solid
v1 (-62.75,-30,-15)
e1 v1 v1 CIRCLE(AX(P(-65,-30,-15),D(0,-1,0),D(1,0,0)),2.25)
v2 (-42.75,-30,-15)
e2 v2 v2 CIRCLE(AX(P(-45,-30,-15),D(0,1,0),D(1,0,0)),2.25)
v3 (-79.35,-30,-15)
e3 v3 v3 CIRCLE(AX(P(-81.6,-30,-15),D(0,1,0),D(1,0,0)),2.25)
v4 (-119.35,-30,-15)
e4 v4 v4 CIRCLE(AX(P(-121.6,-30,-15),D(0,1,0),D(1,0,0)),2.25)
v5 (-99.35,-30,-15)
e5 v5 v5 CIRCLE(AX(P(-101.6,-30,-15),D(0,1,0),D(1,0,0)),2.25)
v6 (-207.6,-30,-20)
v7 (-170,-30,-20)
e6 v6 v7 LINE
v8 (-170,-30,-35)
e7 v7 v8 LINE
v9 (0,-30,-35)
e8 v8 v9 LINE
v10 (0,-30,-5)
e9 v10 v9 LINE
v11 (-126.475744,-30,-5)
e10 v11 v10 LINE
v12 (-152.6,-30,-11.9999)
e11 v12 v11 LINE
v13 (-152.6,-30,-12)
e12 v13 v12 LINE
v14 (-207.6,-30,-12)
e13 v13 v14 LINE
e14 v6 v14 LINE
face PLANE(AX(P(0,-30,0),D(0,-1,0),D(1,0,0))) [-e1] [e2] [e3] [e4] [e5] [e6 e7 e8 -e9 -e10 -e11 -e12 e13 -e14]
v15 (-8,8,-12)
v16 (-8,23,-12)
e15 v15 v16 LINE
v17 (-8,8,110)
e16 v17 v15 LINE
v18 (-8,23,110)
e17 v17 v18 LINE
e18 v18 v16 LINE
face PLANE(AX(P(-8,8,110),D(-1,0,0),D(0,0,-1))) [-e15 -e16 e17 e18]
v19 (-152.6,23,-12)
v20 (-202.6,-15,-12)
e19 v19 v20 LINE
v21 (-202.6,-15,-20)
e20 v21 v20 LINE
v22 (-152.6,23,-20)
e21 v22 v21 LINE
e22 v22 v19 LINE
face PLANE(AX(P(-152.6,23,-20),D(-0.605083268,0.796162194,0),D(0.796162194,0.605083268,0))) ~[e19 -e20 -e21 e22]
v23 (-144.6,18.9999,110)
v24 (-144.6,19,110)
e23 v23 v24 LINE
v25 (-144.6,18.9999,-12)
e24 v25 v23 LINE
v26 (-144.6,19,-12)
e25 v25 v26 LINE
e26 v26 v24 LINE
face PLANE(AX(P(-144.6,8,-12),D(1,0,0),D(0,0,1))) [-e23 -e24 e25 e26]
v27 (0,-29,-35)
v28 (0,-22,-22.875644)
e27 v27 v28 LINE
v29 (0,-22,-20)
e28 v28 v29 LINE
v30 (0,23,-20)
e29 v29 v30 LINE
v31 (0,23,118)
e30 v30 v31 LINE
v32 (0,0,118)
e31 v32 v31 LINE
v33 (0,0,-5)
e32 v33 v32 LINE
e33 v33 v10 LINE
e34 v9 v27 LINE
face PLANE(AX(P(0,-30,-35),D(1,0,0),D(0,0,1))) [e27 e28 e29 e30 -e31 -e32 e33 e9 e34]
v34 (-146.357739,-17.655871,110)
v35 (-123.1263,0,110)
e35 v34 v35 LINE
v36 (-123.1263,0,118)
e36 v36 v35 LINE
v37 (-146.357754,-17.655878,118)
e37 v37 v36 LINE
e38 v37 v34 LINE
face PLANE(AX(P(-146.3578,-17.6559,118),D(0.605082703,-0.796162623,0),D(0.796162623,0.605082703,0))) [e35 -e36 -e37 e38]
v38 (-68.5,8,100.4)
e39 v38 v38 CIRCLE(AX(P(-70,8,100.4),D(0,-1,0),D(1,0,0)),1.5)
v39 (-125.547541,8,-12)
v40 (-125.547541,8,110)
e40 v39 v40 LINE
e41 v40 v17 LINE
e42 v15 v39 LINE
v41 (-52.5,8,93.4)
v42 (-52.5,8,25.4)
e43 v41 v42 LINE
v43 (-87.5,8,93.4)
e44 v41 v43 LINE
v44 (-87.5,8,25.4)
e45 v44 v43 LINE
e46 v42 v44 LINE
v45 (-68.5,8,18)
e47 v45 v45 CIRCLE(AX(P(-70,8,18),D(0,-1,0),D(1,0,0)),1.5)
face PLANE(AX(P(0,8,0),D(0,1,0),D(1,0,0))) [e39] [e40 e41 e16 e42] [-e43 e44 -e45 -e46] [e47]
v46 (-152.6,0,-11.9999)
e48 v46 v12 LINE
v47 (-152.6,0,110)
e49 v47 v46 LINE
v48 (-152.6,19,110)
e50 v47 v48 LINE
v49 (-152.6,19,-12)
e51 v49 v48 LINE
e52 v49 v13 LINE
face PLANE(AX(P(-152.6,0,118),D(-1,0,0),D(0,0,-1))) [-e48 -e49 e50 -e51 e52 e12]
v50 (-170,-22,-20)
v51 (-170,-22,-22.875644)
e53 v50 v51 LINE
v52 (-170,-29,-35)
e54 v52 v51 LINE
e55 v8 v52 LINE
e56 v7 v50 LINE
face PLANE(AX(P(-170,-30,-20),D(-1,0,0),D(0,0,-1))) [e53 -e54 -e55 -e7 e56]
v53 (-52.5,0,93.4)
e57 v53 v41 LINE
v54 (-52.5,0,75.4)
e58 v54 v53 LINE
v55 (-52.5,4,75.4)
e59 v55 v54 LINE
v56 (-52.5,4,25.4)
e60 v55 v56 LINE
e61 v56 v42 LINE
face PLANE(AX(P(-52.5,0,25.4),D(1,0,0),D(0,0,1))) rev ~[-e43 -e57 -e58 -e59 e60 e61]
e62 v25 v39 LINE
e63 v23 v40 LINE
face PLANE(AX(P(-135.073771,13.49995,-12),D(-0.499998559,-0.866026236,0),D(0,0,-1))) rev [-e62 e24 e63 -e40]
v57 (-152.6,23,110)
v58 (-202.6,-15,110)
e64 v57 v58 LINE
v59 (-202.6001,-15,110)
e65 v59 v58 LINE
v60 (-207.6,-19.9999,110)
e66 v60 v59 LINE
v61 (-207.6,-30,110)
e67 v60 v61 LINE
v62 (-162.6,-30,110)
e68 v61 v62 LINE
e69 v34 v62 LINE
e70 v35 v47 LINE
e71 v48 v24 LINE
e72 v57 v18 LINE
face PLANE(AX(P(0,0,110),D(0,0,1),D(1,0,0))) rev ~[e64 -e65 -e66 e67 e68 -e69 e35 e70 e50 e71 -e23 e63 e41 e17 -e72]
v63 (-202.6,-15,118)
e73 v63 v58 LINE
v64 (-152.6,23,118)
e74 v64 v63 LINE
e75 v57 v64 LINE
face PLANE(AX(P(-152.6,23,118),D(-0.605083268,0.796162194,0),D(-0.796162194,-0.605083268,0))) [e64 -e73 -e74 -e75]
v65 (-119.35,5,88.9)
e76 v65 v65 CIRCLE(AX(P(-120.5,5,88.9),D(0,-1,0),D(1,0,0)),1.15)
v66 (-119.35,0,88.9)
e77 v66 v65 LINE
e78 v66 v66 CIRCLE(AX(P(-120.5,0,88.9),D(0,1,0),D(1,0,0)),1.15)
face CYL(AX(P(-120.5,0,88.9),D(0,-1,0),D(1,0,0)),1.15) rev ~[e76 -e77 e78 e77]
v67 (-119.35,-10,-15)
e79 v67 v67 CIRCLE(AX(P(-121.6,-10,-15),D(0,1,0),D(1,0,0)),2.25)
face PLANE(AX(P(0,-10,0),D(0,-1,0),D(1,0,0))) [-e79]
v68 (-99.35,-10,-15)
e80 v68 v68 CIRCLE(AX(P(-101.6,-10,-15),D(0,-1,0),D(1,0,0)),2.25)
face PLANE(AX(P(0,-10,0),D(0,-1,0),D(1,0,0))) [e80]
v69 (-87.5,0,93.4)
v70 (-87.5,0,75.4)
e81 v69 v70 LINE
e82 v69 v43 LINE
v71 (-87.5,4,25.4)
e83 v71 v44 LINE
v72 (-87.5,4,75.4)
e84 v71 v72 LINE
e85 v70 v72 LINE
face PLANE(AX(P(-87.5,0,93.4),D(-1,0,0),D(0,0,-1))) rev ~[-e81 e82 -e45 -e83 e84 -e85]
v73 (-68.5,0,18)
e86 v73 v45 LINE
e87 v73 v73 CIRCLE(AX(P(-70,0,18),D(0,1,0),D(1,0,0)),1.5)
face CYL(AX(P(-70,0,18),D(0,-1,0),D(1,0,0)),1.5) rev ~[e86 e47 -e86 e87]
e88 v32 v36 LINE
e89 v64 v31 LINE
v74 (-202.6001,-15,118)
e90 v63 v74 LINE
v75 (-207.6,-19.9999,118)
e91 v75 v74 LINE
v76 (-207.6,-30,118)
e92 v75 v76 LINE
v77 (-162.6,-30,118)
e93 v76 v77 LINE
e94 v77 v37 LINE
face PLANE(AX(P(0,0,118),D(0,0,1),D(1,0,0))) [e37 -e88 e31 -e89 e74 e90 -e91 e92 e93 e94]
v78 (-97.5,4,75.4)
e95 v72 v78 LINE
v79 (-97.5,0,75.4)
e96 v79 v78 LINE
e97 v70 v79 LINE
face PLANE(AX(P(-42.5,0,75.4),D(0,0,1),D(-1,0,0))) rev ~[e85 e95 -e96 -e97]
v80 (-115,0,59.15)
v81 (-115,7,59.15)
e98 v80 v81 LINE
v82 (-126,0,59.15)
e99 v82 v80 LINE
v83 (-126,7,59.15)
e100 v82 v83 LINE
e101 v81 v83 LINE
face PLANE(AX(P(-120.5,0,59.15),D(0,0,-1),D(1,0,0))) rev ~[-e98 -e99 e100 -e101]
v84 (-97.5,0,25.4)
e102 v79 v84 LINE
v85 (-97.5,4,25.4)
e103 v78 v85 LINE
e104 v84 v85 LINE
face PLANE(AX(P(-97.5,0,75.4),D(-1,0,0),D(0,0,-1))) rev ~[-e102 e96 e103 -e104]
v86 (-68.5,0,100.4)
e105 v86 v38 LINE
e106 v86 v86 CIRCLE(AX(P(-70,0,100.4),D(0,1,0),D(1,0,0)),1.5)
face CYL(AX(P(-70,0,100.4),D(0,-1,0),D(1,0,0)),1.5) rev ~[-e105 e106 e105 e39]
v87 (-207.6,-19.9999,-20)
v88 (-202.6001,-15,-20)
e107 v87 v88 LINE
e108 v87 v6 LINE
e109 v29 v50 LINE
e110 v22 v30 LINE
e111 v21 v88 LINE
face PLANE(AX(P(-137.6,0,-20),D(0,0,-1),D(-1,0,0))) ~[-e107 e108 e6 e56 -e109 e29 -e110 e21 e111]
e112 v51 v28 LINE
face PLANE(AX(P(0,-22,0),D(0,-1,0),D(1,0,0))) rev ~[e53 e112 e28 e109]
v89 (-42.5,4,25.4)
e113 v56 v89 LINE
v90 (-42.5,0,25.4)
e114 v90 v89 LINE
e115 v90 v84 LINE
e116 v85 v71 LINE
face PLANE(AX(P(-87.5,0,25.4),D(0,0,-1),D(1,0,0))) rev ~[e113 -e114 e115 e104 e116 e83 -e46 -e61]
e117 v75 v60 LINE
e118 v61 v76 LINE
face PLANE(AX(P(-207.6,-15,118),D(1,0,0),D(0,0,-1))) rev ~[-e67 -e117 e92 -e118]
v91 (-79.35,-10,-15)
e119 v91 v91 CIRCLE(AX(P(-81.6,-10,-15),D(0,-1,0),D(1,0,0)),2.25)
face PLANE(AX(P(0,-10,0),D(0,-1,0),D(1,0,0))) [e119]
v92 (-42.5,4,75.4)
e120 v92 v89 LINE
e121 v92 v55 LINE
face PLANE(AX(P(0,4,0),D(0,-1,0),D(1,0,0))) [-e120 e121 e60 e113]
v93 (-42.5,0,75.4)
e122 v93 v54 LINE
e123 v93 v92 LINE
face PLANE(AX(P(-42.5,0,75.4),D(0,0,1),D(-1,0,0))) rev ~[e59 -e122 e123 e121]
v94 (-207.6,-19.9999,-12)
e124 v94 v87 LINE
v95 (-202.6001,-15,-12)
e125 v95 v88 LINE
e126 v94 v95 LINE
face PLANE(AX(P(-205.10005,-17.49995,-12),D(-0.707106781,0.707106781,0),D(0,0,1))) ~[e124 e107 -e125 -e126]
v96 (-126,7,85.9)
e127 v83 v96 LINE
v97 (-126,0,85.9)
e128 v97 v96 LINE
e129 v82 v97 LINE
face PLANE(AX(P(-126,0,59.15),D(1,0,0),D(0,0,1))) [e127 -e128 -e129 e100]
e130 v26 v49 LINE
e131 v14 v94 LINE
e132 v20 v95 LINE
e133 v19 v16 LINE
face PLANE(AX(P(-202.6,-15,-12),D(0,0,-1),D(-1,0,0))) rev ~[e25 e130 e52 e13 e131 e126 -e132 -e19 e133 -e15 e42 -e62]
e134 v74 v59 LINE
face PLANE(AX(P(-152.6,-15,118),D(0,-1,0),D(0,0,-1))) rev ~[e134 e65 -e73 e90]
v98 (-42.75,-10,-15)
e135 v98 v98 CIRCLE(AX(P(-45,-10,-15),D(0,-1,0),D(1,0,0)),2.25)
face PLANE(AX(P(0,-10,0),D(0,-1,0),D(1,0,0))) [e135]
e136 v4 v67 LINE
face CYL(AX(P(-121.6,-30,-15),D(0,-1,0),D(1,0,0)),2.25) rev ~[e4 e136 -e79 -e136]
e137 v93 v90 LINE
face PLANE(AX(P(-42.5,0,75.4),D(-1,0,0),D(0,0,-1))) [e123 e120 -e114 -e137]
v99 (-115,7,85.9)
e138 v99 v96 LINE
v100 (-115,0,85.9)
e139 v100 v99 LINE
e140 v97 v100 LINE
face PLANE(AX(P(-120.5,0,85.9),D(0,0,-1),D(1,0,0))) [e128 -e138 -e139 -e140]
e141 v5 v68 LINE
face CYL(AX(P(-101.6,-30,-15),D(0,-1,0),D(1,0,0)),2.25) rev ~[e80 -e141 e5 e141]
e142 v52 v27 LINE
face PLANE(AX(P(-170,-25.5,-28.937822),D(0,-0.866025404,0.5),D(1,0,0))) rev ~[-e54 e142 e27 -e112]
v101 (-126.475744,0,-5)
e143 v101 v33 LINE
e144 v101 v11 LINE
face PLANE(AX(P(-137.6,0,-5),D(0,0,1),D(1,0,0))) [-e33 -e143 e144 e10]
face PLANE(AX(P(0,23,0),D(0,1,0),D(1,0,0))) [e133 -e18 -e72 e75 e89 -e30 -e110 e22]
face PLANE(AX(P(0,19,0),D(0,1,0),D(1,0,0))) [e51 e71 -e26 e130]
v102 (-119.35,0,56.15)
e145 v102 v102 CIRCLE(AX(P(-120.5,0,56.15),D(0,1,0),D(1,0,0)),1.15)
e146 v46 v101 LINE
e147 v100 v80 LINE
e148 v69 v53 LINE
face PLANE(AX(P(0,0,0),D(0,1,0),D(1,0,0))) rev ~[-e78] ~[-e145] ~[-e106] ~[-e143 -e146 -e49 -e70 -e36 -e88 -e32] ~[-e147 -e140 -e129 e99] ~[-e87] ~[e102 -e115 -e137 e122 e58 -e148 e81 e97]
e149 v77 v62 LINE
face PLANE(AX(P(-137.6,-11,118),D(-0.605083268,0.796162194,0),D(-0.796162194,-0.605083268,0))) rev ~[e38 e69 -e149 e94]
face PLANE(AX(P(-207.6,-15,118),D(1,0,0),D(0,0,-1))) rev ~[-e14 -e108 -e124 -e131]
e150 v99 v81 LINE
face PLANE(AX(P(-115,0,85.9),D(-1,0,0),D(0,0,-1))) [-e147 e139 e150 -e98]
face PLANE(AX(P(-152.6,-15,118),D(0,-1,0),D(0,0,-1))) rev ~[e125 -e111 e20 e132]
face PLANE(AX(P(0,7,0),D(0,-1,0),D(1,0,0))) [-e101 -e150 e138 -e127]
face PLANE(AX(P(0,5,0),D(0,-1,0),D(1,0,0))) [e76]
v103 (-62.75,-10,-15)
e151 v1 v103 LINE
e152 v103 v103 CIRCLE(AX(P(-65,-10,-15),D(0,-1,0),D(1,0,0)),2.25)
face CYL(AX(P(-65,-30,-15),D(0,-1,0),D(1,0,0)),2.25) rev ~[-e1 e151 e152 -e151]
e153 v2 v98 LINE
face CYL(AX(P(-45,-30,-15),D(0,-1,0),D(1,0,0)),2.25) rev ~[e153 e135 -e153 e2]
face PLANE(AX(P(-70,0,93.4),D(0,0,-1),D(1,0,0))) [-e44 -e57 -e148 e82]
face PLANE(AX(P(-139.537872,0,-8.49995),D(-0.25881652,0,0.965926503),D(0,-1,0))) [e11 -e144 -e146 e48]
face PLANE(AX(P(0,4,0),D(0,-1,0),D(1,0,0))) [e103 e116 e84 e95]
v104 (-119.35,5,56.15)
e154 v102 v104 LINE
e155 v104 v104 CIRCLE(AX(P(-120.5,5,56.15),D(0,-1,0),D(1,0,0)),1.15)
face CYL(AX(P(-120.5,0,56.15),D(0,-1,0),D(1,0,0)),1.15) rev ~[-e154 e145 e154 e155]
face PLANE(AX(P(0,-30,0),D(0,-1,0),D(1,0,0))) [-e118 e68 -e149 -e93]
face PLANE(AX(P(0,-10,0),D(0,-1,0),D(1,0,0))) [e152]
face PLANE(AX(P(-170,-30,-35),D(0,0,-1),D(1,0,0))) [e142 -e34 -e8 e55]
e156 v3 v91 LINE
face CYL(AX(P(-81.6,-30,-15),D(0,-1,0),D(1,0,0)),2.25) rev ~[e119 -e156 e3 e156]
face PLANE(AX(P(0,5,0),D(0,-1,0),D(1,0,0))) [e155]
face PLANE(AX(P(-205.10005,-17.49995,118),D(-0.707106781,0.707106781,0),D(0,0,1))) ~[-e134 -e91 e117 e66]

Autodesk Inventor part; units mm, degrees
ref_plane "YZ Plane" through (0, 0, 0) normal (1, 0, 0) x (0, 1, 0)
ref_plane "XZ Plane" through (0, 0, 0) normal (0, 1, 0) x (-1, 0, 0)
sketch "Sketch1" plane through (0, 0, 0) normal (0, 1, 0) x (-1, 0, 0)
  line L0 (0, 0) -> (159.6, 0)
  line L1 (159.6, 46) -> (159.6, 118)
  line L2 (159.6, 118) -> (0, 118)
  line L3 (0, 118) -> (0, 0)
  line L4 (159.6, 118) -> (159.6, 46)
  line L5 (0, 0) -> (113, 0)
  line L6 (113, 0) -> (159.6, 46)
  line L7 (159.6, 118) -> (167.6, 118)
  line L8 (167.6, 118) -> (167.6, 46)
  line L9 (167.6, 46) -> (159.6, 46)
  line L10 (159.6, 46) -> (159.6, 118)
  line L11 (113, 0) -> (0, 0)
  line L12 (0, 0) -> (0, -8)
  line L13 (0, -8) -> (113, -8)
  line L14 (113, -8) -> (113, 0)
  line L15 (0, 0) -> (0, 10)
  line L16 (0, 10) -> (9, 10)
  circle A0 centre (9, 10) radius 2.25
  line L17 (159.6, 118) -> (159.6, 89)
  line L18 (159.6, 89) -> (149.6, 89)
  circle A1 centre (149.6, 89) radius 2.25
  line L19 (159.6, 118) -> (159.6, 0)
  dimension "d0" = 159.6
  dimension "d2" = 72
  dimension "d3" = 113
  dimension "d4" = 8
  dimension "d5" = 8
  dimension "d6" = 10
  dimension "d7" = 9
  dimension "d8" = 4.5
  dimension "d9" = 29
  dimension "d10" = 10
  dimension "d11" = 4.5
  dimension "d14" = 118
extrude "Extrusion2" add sketch "Sketch1" along normal blind 8 contours L3 L2 L1 L6 L0 | L0 L14 L13 L12 | L1 L7 L8 L9
sketch "Sketch2" plane through (0, 8, 0) normal (0, 1, 0) x (1, 0, 0)
  line L0 (-113, 8) -> (-113, 0) projected
  line L1 (-159.6, -46) -> (-113, 0)
  line L2 (-113, 0) -> (-94.4074, 18.3532)
  line L3 (-113, 0) -> (-159.6, -46) projected
  line L4 (-113, 0) -> (-159.6, -46)
  line L5 (-159.6, -46) -> (-175.759, -61.951)
  line L6 (-175.759, -61.951) -> (-174.3006, -39.4963)
  line L7 (-174.3006, -39.4963) -> (-106.8014, 20.2158)
  line L8 (-106.8014, 20.2158) -> (-94.4074, 18.3532)
  point P0 (0, 0)
extrude "Extrusion3" cut sketch "Sketch2" against normal blind 10
sketch "Sketch3" plane through (0, 0, 0) normal (0, -1, 0) x (1, 0, 0)
  line L0 (-167.6, 118) -> (0, 118) projected
  line L1 (-167.6, 118) -> (-167.6, 92.4)
  line L2 (-167.6, 53.897) -> (-167.6, 118) projected
  line L3 (-167.6, 92.4) -> (-128, 92.4)
  line L4 (-128, 92.4) -> (-120.5, 92.4)
  line L5 (-120.5, 92.4) -> (-120.5, 88.9)
  line L6 (-120.5, 88.9) -> (-128, 88.9)
  line L7 (-128, 88.9) -> (-128, 92.4)
  line L8 (-120.5, 88.9) -> (-120.5, 56.15)
  line L9 (-120.5, 88.9) -> (-87.75, 88.9) construction
  circle A0 centre (-120.5, 88.9) radius 1.15
  circle A1 centre (-120.5, 56.15) radius 1.15
  line L10 (-120.5, 88.9) -> (-120.5, 90.9)
  line L11 (-120.5, 88.9) -> (-120.5, 85.9)
  line L12 (-120.5, 56.15) -> (-120.5, 59.15)
  line L13 (-120.5, 59.15) -> (-115, 59.15)
  line L14 (-120.5, 85.9) -> (-126, 85.9)
  line L15 (-126, 85.9) -> (-115, 85.9)
  line L16 (-115, 85.9) -> (-115, 59.15)
  line L17 (-115, 59.15) -> (-126, 59.15)
  line L18 (-126, 59.15) -> (-126, 85.9)
  point P0 (0, 0)
  dimension "d19" = 25.6
  dimension "d20" = 39.6
  dimension "d21" = 7.5
  dimension "d22" = 3.5
  dimension "d23" = 32.75
  dimension "d24" = 90
  dimension "d25" = 2.3
  dimension "d26" = 2.3
  dimension "d29" = 2
  dimension "d30" = 3
  dimension "d31" = 3
  dimension "d32" = 5.5
  dimension "d33" = 5.5
extrude "Extrusion4" cut sketch "Sketch3" against normal blind 5 contours A0 L5 L6 | L6 L8 A0 | A0 L8 L5 | A1
sketch "Sketch5" plane through (0, 8, 0) normal (0, 1, 0) x (1, 0, 0)
  circle A0 centre (-9, -10) radius 2.25 projected
  circle A1 centre (-149.6, -89) radius 2.25 projected
  line L0 (-9, -10) -> (-149.6, -89)
  line L1 (-149.6, -89) -> (-116.8523, -147.2827)
  line L2 (-116.8523, -147.2827) -> (-175.4275, -43.0335)
  line L3 (-149.6, -89) -> (-9, -10)
  line L4 (-79.3, -49.5) -> (-9, -10)
  line L5 (-149.6, -89) -> (-144.7015, -97.7181)
  line L6 (-116.8523, -147.2827) -> (-175.4275, -43.0335)
  line L7 (-175.4275, -43.0335) -> (-34.8275, 35.9665)
  line L8 (-34.8275, 35.9665) -> (23.7477, -68.2827)
  line L9 (23.7477, -68.2827) -> (-116.8523, -147.2827)
  circle A2 centre (-9, -10) radius 4.5 projected
  line L10 (-9, -10) -> (-4.1015, -18.7181)
  line L11 (-4.1015, -18.7181) -> (-1.6523, -23.0771)
  line L12 (-1.6523, -23.0771) -> (8.1447, -40.5133)
  line L13 (8.1447, -40.5133) -> (10.594, -44.8723)
  line L14 (-144.7015, -97.7181) -> (-142.2523, -102.0771)
  line L15 (-142.2523, -102.0771) -> (-132.4553, -119.5133)
  line L16 (-132.4553, -119.5133) -> (-130.006, -123.8723)
  line L17 (-149.6, -89) -> (-154.4985, -80.2819)
  line L18 (-154.4985, -80.2819) -> (-156.9477, -75.9229)
  line L19 (-9, -10) -> (-13.8985, -1.2819)
  line L20 (-13.8985, -1.2819) -> (-16.3477, 3.0771)
  line L21 (-167.6, -53.897) -> (-167.6, -118) projected
  line L22 (-167.6, -118) -> (0, -118)
  line L23 (0, -118) -> (0, 8)
  line L24 (0, 8) -> (-167.6, 8)
  line L25 (-167.6, 8) -> (-167.6, -118)
  line L26 (-16.3477, 3.0771) -> (-156.9477, -75.9229)
  line L27 (-154.4985, -80.2819) -> (-13.8985, -1.2819)
  line L28 (-4.1015, -18.7181) -> (-144.7015, -97.7181)
  line L29 (-142.2523, -102.0771) -> (-1.6523, -23.0771)
  line L30 (8.1447, -40.5133) -> (-132.4553, -119.5133)
  line L31 (-130.006, -123.8723) -> (10.594, -44.8723)
  line L32 (-4.1015, -18.7181) -> (7.818, -12.0208)
  line L33 (-1.6523, -23.0771) -> (4.3075, -19.7285)
  line L34 (-13.8985, -1.2819) -> (7.818, 10.9201)
  line L35 (-16.3477, 3.0771) -> (3.62, 14.2965)
  line L36 (-144.7015, -97.7181) -> (-142.2523, -102.0771)
  line L37 (-142.2523, -102.0771) -> (-178.8351, -122.6322)
  line L38 (-178.8351, -122.6322) -> (-181.2843, -118.2731)
  line L39 (-181.2843, -118.2731) -> (-144.7015, -97.7181)
  line L40 (-154.4985, -80.2819) -> (-156.9477, -75.9229)
  line L41 (-156.9477, -75.9229) -> (-183.573, -90.883)
  line L42 (-183.573, -90.883) -> (-181.1237, -95.242)
  line L43 (-181.1237, -95.242) -> (-154.4985, -80.2819)
  line L44 (0, 8) -> (-104.8957, 8) projected
  line L45 (0, 8) -> (-5, 8)
  line L46 (-5, 8) -> (-5, 3)
  line L47 (-5, 3) -> (0, 3)
  line L48 (0, 3) -> (0, 8)
  line L49 (-104.8957, 8) -> (-167.6, -53.897) projected
  line L50 (-104.8957, 8) -> (-167.6, -53.897)
  line L51 (-167.6, -53.897) -> (-164.0874, -57.4554)
  line L52 (-164.0874, -57.4554) -> (-101.3831, 4.4416)
  line L53 (-101.3831, 4.4416) -> (-104.8957, 8)
  line L54 (0, -118) -> (0, 8) projected
  line L55 (0, 3) -> (0, 8)
  line L56 (0, 8) -> (-113.2487, 8)
  line L57 (-113.2487, 8) -> (-113.2487, 3)
  line L58 (-113.2487, 3) -> (0, 3)
  line L59 (-5, 8) -> (0, 8)
  line L60 (0, 8) -> (0, -118)
  line L61 (0, -118) -> (-5, -118)
  line L62 (-5, -118) -> (-5, 8)
  line L63 (-167.6, -118) -> (0, -118) projected
  line L64 (-167.6, -118) -> (-162.6, -118)
  line L65 (-162.6, -118) -> (-162.6, -39.4397)
  line L66 (-162.6, -39.4397) -> (-167.6, -39.4397)
  line L67 (-167.6, -39.4397) -> (-167.6, -118)
  line L68 (-167.6, -118) -> (0, -118) projected
  line L69 (0, -118) -> (-186.0038, -118)
  line L70 (-186.0038, -118) -> (-186.0038, -113)
  line L71 (-186.0038, -113) -> (0, -113)
  line L72 (0, -113) -> (0, -118)
  point P0 (0, 0)
  point P1 (-162.6, -107.7748)
  point P2 (-162.6, -84.834)
  point P3 (-6.2777, 3)
  point P4 (-5, -7.9384)
  point P5 (-5, -12.0616)
  point P6 (-5, -19.2229)
  point P7 (-5, -24.9581)
  point P8 (-5, -47.899)
  point P9 (-120.8633, -113)
  point P10 (-161.6922, -113)
  point P11 (-162.6, -113.51)
  point P12 (-162.6, -113)
  point P13 (-5, -113)
  point P14 (-110.6561, -113)
  point P15 (-5, -53.6342)
  point P16 (-162.6, -79.0988)
  point P17 (-162.6, -55.9871)
  point P18 (-102.8435, 3)
  point P19 (-16.485, 3)
  point P20 (-16.3044, 3)
  dimension "d45" = 10
  dimension "d46" = 10
  dimension "d47" = 5
  dimension "d48" = 20
  dimension "d49" = 5
  dimension "d50" = 5
  dimension "d51" = 20
  dimension "d52" = 5
  dimension "d53" = 10
  dimension "d54" = 5
  dimension "d55" = 10
  dimension "d56" = 5
  dimension "d57" = 5
  dimension "d58" = 5
  dimension "d59" = 5
  dimension "d60" = 5
  dimension "d61" = 5
extrude "Extrusion7" cut sketch "Sketch3" against normal blind 7 contours L15 L16 L13 L8 | L8 L17 L18 L14
sketch "Sketch7" plane through (0, 0, 0) normal (0, -1, 0) x (1, 0, 0)
  line L0 (-167.6, 118) -> (0, 118) projected
  line L1 (0, 118) -> (-70, 118)
  line L2 (-70, 118) -> (-70, 100.4)
  line L3 (-70, 100.4) -> (-70, 18)
  circle A0 centre (-70, 100.4) radius 1.5
  circle A1 centre (-70, 18) radius 1.5
  point P0 (0, 0)
  dimension "d66" = 70
  dimension "d67" = 17.6
  dimension "d68" = 82.4
  dimension "d69" = 3
  dimension "d70" = 3
extrude "Extrusion8" cut sketch "Sketch7" against normal blind 30
sketch "Sketch8" plane through (0, 0, 0) normal (0, -1, 0) x (1, 0, 0)
  circle A0 centre (-70, 100.4) radius 1.5 projected
  line L0 (-70, 100.4) -> (-70, 93.4)
  line L1 (-70, 93.4) -> (-52.5, 93.4)
  line L2 (-52.5, 93.4) -> (-87.5, 93.4)
  line L3 (-87.5, 93.4) -> (-87.5, 25.4)
  line L4 (-87.5, 25.4) -> (-52.5, 25.4)
  line L5 (-52.5, 25.4) -> (-52.5, 93.4)
  point P0 (0, 0)
  dimension "d73" = 7
  dimension "d74" = 17.5
  dimension "d75" = 35
  dimension "d76" = 68
extrude "Extrusion9" cut sketch "Sketch8" against normal blind 23 contours L1 L5 L4 L3 L2
extrude "Extrusion10" add sketch "Sketch5" along normal blind 15 contours L62 L47 L23 L32 L8 A2 | L8 L28 L62 | L8 L35 L24 L46 L34 L58 | L34 L46 L58 | L46 L34 L23 L47 | L32 L23 L33 L8 | L8 L29 L62 L28 | L26 L58 L7 L24 L8 | L8 L24 L35 | L65 L39 L21 L43 | L43 L21 L41 L65 | L46 L24 L23 L34 | L33 L23 L8 | L8 L23 L30 L62 L29 | L58 L52 L53 L24 L7 | L65 L41 L21 L2 | L2 L21 L51 L52 L65 | L65 L71 L21 L39 | L30 L23 L31 L62 | L52 L65 L49 L7 | L7 L49 L58 L52 | L58 L49 L53 L52 | L52 L51 L49 L65 | L71 L37 L65 | L65 L37 L21 L71 | L71 L30 L22 L1 | L1 L22 L65 L37 L71 | L71 L31 L22 L30 | L31 L23 L9 L62 | L65 L22 L21 L37 | L71 L9 L22 L31 | L9 L23 L71 L62 | L71 L62 L22 L9 | L71 L23 L22 L62
sketch "Sketch10" plane through (0, 0, 0) normal (0, -1, 0) x (1, 0, 0)
  line L0 (-52.5, 93.4) -> (-87.5, 93.4) projected
  line L1 (-70, 93.4) -> (-42.5, 93.4)
  line L2 (-42.5, 93.4) -> (-42.5, 75.4)
  line L3 (-42.5, 75.4) -> (-42.5, 25.4)
  line L4 (-42.5, 75.4) -> (-97.5, 75.4)
  line L5 (-97.5, 75.4) -> (-97.5, 25.4)
  line L6 (-97.5, 25.4) -> (-42.5, 25.4)
  line L7 (-42.5, 25.4) -> (-42.5, 75.4)
  point P0 (0, 0)
  point P1 (-42.5, 25.4)
  dimension "d81" = 27.5
  dimension "d82" = 18
  dimension "d83" = 50
  dimension "d84" = 55
  dimension "d87" = 50
extrude "Extrusion11" cut sketch "Sketch10" against normal blind 4
sketch "Sketch11" plane through (0, 8, 0) normal (0, 1, 0) x (1, 0, 0)
  line L0 (-162.6, -55.9871) -> (-102.8435, 3) projected
  line L1 (-162.6, -55.9871) -> (-102.8435, -55.9871)
  line L2 (-102.8435, -55.9871) -> (-102.8435, 3)
  line L3 (-102.8435, 3) -> (-162.6, 3)
  line L4 (-162.6, 3) -> (-162.6, -55.9871)
  point P0 (0, 0)
extrude "Extrusion12" cut sketch "Sketch11" along normal blind 20 contours L4 L3 L0
sketch "Sketch12" plane through (0, 8, 0) normal (0, 1, 0) x (1, 0, 0)
  line L0 (0, 8) -> (-104.8957, 8) projected
  line L1 (-167.6, -53.897) -> (-104.8957, -53.897)
  line L2 (-104.8957, -53.897) -> (-104.8957, 8)
  line L3 (-104.8957, 8) -> (-167.6, 8)
  line L4 (-167.6, 8) -> (-167.6, -53.897)
  line L5 (-104.8957, 8) -> (-109.9609, 3) projected
  line L6 (-162.6, -48.9614) -> (-109.9609, 3) projected
  line L7 (-109.9609, 3) -> (-162.6, 3)
  line L8 (-162.6, 3) -> (-162.6, -48.9614)
  line L9 (-162.6, -48.9614) -> (-109.9609, -48.9614)
  line L10 (-109.9609, -48.9614) -> (-109.9609, 3)
  point P0 (0, 0)
extrude "Extrusion13" add sketch "Sketch12" against normal blind 8 contours L8 L7 L6
sketch "Sketch13" plane through (0, 8, 0) normal (0, 1, 0) x (1, 0, 0)
  line L0 (-104.8957, 8) -> (-109.9609, 3) projected
  line L1 (-167.6, -53.897) -> (-167.6, -118) projected
  line L2 (-104.8957, 8) -> (-167.6, 8)
  line L3 (-167.6, 8) -> (-167.6, -53.897)
  line L4 (-167.6, -53.897) -> (-104.8957, -53.897)
  line L5 (-104.8957, -53.897) -> (-104.8957, 8)
  line L6 (-167.6, -53.897) -> (-162.6, -48.9614) projected
  line L7 (-109.9609, 3) -> (-162.6, 3)
  line L8 (-162.6, 3) -> (-162.6, -48.9614)
  line L9 (-162.6, -48.9614) -> (-109.9609, -48.9614)
  line L10 (-109.9609, -48.9614) -> (-109.9609, 3)
  point P0 (0, 0)
extrude "Extrusion14" add sketch "Sketch13" along normal blind 15 contours L0 L7 L8 L6 L3 L2
extrude "Extrusion15" add sketch "Sketch13" against normal blind 8 contours L0 L7 L8 L6 L3 L2
sketch "Sketch14" plane through (0, 8, 0) normal (0, 1, 0) x (1, 0, 0)
  circle A0 centre (-9, -10) radius 2.25 projected
  circle A1 centre (-9, -10) radius 2.25
  circle A2 centre (-149.6, -89) radius 2.25 projected
  circle A3 centre (-149.6, -89) radius 2.25
  point P0 (0, 0)
extrude "Extrusion16" add sketch "Sketch14" against normal blind 8
sketch "Sketch15" plane through (-162.6, 8, -3) normal (0, 0, 1) x (1, 0, 0)
  line L0 (0, 0) -> (0, 15) projected
  line L1 (0, 0) -> (187.1145, 0)
  line L2 (187.1145, 0) -> (187.1145, 32.8741)
  line L3 (187.1145, 32.8741) -> (0, 32.8741)
  line L4 (0, 32.8741) -> (0, 0)
  line L5 (0, 0) -> (-28.6153, 0)
  line L6 (-28.6153, 0) -> (-28.6153, 26.9098)
  line L7 (-28.6153, 26.9098) -> (0, 26.9098)
  line L8 (0, 26.9098) -> (0, 0)
  point P0 (162.6, -8)
extrude "Extrusion17" cut sketch "Sketch15" along normal mid plane 900
sketch "Sketch16" plane through (0, 8, 0) normal (0, 1, 0) x (1, 0, 0)
  line L0 (-167.6, 8) -> (0, 8) projected
  line L1 (0, 8) -> (-167.6, 8)
  line L2 (-167.6, 8) -> (-167.6, 20)
  line L3 (-167.6, 20) -> (0, 20)
  line L4 (0, 20) -> (0, 8)
  point P0 (0, 0)
  dimension "d100" = 12
extrude "Extrusion18" add sketch "Sketch16" against normal blind 8
sketch "Sketch17" plane through (0, 0, 0) normal (0, -1, 0) x (1, 0, 0)
  line L0 (-167.6, 118) -> (0, 118) projected
  line L1 (-167.6, -20) -> (0, -20) projected
  line L2 (-167.6, 118) -> (-152.6, 118)
  line L3 (-152.6, 118) -> (-152.6, -20)
  line L4 (-152.6, -20) -> (-167.6, -20)
  line L5 (-167.6, -20) -> (-167.6, 118)
  point P0 (0, 0)
  dimension "d103" = 15
extrude "Extrusion19" cut sketch "Sketch17" against normal blind 8
sketch "Sketch18" plane through (0, 0, 0) normal (0, -1, 0) x (1, 0, 0)
  line L0 (0, -20) -> (-152.6, -20) projected
  line L1 (-152.6, -20) -> (-152.6, 118) projected
  line L2 (0, -20) -> (-152.6, -20)
  line L3 (-152.6, -20) -> (-152.6, -5)
  line L4 (-152.6, -5) -> (0, -5)
  line L5 (0, -5) -> (0, -20)
  line L6 (-152.6, 118) -> (-137.6, 118)
  line L7 (-137.6, 118) -> (-137.6, -5)
  line L8 (-137.6, -5) -> (-152.6, -5)
  line L9 (-152.6, -5) -> (-152.6, 118)
  point P0 (0, 0)
  dimension "d106" = 15
  dimension "d107" = 15
extrude "Extrusion20" add sketch "Sketch18" along normal blind 30
sketch "Sketch19" plane through (-152.6, 8, -20) normal (-1, 0, 0) x (0, 0, 1)
  line L0 (138, 0) -> (138, -38) projected
  line L1 (0, -38) -> (138, -38)
  line L2 (138, -38) -> (138, -23)
  line L3 (138, -23) -> (0, -23)
  line L4 (0, -23) -> (0, -38)
  point P0 (20, -8)
  dimension "d110" = 15
extrude "Extrusion21" add sketch "Sketch19" along normal blind 70
ref_plane "Work Plane1" through (0, 0, 49) normal (0, 0, 1) x (1, 0, 0)
sketch "Sketch21" plane through (0, 8, 0) normal (0, 1, 0) x (1, 0, 0)
  line L0 (0, 20) -> (-152.6, 20) projected
  line L1 (0, 20) -> (-8, 20)
  line L2 (-8, 20) -> (-8, 12)
  line L3 (-8, 12) -> (0, 12)
  line L4 (0, 12) -> (0, 20)
  line L5 (0, -118) -> (-152.6, -118) projected
  line L6 (-152.6, -118) -> (-144.6, -118)
  line L7 (-144.6, -118) -> (-144.6, -110)
  line L8 (-144.6, -110) -> (-152.6, -110)
  line L9 (-152.6, -110) -> (-152.6, -118)
  line L10 (-144.6, -110) -> (-8, -110)
  line L11 (-8, -110) -> (-8, 12)
  line L12 (-8, 12) -> (-144.6, 12)
  line L13 (-144.6, 12) -> (-144.6, -110)
  line L14 (0, 20) -> (-152.6, 20)
  line L15 (-152.6, 20) -> (-152.6, -118)
  line L16 (-152.6, -118) -> (0, -118)
  line L17 (0, -118) -> (0, 20)
  point P0 (0, 0)
  dimension "d116" = 8
  dimension "d117" = 8
  dimension "d118" = 8
  dimension "d119" = 8
extrude "Extrusion23" add sketch "Sketch21" along normal blind 15 contours L4 L3 L2 L0 | L2 L12 L13 L8 L15 L0 | L17 L5 L7 L10 L11 L3 | L8 L7 L5 L9
sketch "Sketch22" plane through (-137.6, 0, 118) normal (0, 0, 1) x (1, 0, 0)
  line L0 (-15, -15) -> (-15, 23) projected
  line L1 (-15, -15) -> (-85, -15) projected
  line L2 (-15, 23) -> (-65, 23)
  line L3 (-65, 23) -> (-65, -15)
  line L4 (-65, -15) -> (-15, -15)
  line L5 (-15, -15) -> (-15, 23)
  line L6 (-15, 23) -> (-65, -15)
  point P0 (137.6, 0)
  dimension "d123" = 50
extrude "Extrusion24" add sketch "Sketch22" against normal blind 8 contours L1 L6 L0
mirror "Mirror2" about plane through (0, 0, 49) normal (0, 0, 1) of "Extrusion24"
sketch "Sketch23" plane through (0, -30, 0) normal (0, -1, 0) x (1, 0, 0)
  line L0 (0, -20) -> (0, -5) projected
  line L1 (0, -20) -> (-170, -20)
  line L2 (-170, -20) -> (-170, -35)
  line L3 (-170, -35) -> (0, -35)
  line L4 (0, -35) -> (0, -20)
  point P0 (0, 0)
  dimension "d126" = 170
  dimension "d127" = 15
extrude "Extrusion25" add sketch "Sketch23" against normal blind 8
sketch "Sketch24" plane through (-222.6, -15, 118) normal (0, 1, 0) x (1, 0, 0)
  line L0 (85, 0) -> (0, 0) projected
  line L1 (52.6, 138) -> (0, 138) projected
  line L2 (0, 0) -> (15, 0)
  line L3 (15, 0) -> (15, 138)
  line L4 (15, 138) -> (0, 138)
  line L5 (0, 138) -> (0, 0)
  point P0 (222.6, 118)
  dimension "d130" = 15
extrude "Extrusion26" cut sketch "Sketch24" against normal blind 100
sketch "Sketch25" plane through (0, -30, 0) normal (0, -1, 0) x (1, 0, 0)
  line L0 (0, -5) -> (-137.6, -5) projected
  line L1 (0, -5) -> (-45, -5)
  line L2 (-45, -5) -> (-45, -15)
  line L3 (-45, -15) -> (0, -15)
  line L4 (0, -15) -> (0, -5)
  circle A0 centre (-45, -15) radius 2.25
  point P0 (0, 0)
  dimension "d133" = 45
  dimension "d134" = 10
  dimension "d135" = 4.5
sketch "Sketch26" plane through (0, -30, 0) normal (0, -1, 0) x (1, 0, 0)
  line L0 (-170, -20) -> (-207.6, -20) projected
  line L1 (-207.6, -20) -> (-121.6, -20)
  line L2 (-121.6, -20) -> (-121.6, -15)
  line L3 (0, -5) -> (-137.6, -5) projected
  circle A0 centre (-121.6, -15) radius 2.25
  point P0 (0, 0)
  dimension "d136" = 86
  dimension "d137" = 5
  dimension "d138" = 4.5
extrude "Extrusion27" cut sketch "Sketch26" against normal blind 20
extrude "Extrusion28" cut sketch "Sketch25" against normal blind 20 contours A0 L3 L2 | L2 L3 A0
sketch "Sketch27" plane through (0, -30, 0) normal (0, -1, 0) x (1, 0, 0)
  circle A0 centre (-121.6, -15) radius 2.25 projected
  line L0 (-121.6, -15) -> (-101.6, -15)
  line L1 (-101.6, -15) -> (-81.6, -15)
  circle A1 centre (-45, -15) radius 2.25 projected
  line L2 (-45, -15) -> (-65, -15)
  circle A2 centre (-101.6, -15) radius 2.25
  circle A3 centre (-81.6, -15) radius 2.25
  circle A4 centre (-65, -15) radius 2.25
  point P0 (0, 0)
  dimension "d143" = 20
  dimension "d144" = 20
  dimension "d145" = 20
  dimension "d146" = 4.5
  dimension "d147" = 4.5
  dimension "d148" = 4.5
extrude "Extrusion29" cut sketch "Sketch27" against normal blind 20 contours A2 L1 L0 | L0 L1 A2 | A3 | A4
sketch "Sketch28" plane through (-202.6, -15, 110) normal (0, 1, 0) x (1, 0, 0)
  line L0 (0, 122) -> (50, 122) projected
  line L1 (50, 122) -> (-30.0077, 122)
  line L2 (-30.0077, 122) -> (-30.0077, 0)
  line L3 (-30.0077, 0) -> (50, 0)
  line L4 (50, 0) -> (50, 122)
  point P0 (202.6, 110)
extrude "Extrusion30" cut sketch "Sketch28" against normal blind 100
sketch "Sketch29" plane through (-137.6, 0, 118) normal (1, 0, 0) x (0, 0, -1)
  line L0 (0, 0) -> (0, -30) projected
  line L1 (8, 23) -> (8, -30) projected
  line L2 (0, 0) -> (8, 0)
  line L3 (8, 0) -> (8, -30)
  line L4 (8, -30) -> (0, -30)
  line L5 (0, -30) -> (0, 0)
  line L6 (0, -30) -> (8, -30) projected
  line L7 (8, -30) -> (123, -30)
  line L8 (123, -30) -> (123, 0)
  line L9 (123, 0) -> (8, 0)
  line L10 (8, 0) -> (8, -30)
  point P0 (118, 0)
extrude "Extrusion31" cut sketch "Sketch29" against normal blind 100 contours L9 L8 L7 L1
sketch "Sketch30" plane through (-137.6, 0, 118) normal (0, 0, 1) x (1, 0, 0)
  line L0 (-15, 23) -> (-15, -30) projected
  line L1 (-15, 23) -> (-15, -15)
  line L2 (-15, 23) -> (-15, -30) projected
  line L3 (-70, -15) -> (-65, -15) projected
  line L4 (-65, -15) -> (-15, -15)
  line L5 (0, 0) -> (0, -30) projected
  line L6 (0, -30) -> (-25, -30)
  line L7 (-25, -30) -> (-25, -11)
  line L8 (-25, -11) -> (0, -11)
  line L9 (0, -11) -> (0, -30)
  line L10 (0, -11) -> (-25, -30)
  point P0 (137.6, 0)
  point P1 (-15, 0)
  dimension "d158" = 25
  dimension "d159" = 19
extrude "Extrusion32" cut sketch "Sketch30" against normal blind 10 contours L5 L6 L0 L10 | L0 L6 L10
chamfer "Chamfer3" distance 7 angle 60 1 edges at (-85, -22, -35) measured on face at (-113.3333, -24.6667, -35)
chamfer "Chamfer4" distance 5 angle 45 2 edges at (-207.6, -15, -16) (-207.6, -15, 114)
chamfer "Chamfer5" distance 7 angle 75 1 edges at (-152.6, -15, -5) measured on face at (-152.6, 15.3333, 31)
chamfer "Chamfer6" distance 11 angle 45 1 edges at (-137.6, -11, 114)
sketch "Sketch31" plane through (0, 0, 118) normal (0, 0, 1) x (1, 0, 0)
  line L0 (-162.6, -30) -> (-207.6, -30) projected
  line L1 (-162.6, -30) -> (-146.3578, -17.6559)
  line L2 (-146.3578, -17.6559) -> (-103.4655, 14.9422)
  line L3 (-115, 0) -> (-126, 0) projected
  line L4 (-137.6, 0) -> (-146.3578, -17.6559) projected
  line L5 (-123.1263, 0) -> (-137.6, 0)
  line L6 (-137.6, 0) -> (-146.3578, -17.6559)
  line L7 (-146.3578, -17.6559) -> (-123.1263, 0)
  line L8 (-137.6, 0) -> (-152.6, 0) projected
  line L9 (-137.6, 0) -> (-123.1263, 0)
  point P0 (0, 0)
extrude "Extrusion33" add sketch "Sketch31" against normal blind 8
sketch "Sketch32" plane through (0, 23, 0) normal (0, 1, 0) x (1, 0, 0)
  line L0 (-144.6, 12) -> (-144.6, -110) projected
  line L1 (-152.6, -110) -> (-152.6, -118) projected
  line L2 (-144.6, 12) -> (-152.6, 12)
  line L3 (-152.6, 12) -> (-152.6, -110)
  line L4 (-152.6, -110) -> (-144.6, -110)
  line L5 (-144.6, -110) -> (-144.6, 12)
  point P0 (0, 0)
extrude "Extrusion34" cut sketch "Sketch32" against normal blind 4
chamfer "Chamfer7" distance 11 angle 60 1 edges at (-144.6, 8, 49) measured on face at (-144.6, 11.6667, 69.3333)
properties part number "mount_for_plugs"
